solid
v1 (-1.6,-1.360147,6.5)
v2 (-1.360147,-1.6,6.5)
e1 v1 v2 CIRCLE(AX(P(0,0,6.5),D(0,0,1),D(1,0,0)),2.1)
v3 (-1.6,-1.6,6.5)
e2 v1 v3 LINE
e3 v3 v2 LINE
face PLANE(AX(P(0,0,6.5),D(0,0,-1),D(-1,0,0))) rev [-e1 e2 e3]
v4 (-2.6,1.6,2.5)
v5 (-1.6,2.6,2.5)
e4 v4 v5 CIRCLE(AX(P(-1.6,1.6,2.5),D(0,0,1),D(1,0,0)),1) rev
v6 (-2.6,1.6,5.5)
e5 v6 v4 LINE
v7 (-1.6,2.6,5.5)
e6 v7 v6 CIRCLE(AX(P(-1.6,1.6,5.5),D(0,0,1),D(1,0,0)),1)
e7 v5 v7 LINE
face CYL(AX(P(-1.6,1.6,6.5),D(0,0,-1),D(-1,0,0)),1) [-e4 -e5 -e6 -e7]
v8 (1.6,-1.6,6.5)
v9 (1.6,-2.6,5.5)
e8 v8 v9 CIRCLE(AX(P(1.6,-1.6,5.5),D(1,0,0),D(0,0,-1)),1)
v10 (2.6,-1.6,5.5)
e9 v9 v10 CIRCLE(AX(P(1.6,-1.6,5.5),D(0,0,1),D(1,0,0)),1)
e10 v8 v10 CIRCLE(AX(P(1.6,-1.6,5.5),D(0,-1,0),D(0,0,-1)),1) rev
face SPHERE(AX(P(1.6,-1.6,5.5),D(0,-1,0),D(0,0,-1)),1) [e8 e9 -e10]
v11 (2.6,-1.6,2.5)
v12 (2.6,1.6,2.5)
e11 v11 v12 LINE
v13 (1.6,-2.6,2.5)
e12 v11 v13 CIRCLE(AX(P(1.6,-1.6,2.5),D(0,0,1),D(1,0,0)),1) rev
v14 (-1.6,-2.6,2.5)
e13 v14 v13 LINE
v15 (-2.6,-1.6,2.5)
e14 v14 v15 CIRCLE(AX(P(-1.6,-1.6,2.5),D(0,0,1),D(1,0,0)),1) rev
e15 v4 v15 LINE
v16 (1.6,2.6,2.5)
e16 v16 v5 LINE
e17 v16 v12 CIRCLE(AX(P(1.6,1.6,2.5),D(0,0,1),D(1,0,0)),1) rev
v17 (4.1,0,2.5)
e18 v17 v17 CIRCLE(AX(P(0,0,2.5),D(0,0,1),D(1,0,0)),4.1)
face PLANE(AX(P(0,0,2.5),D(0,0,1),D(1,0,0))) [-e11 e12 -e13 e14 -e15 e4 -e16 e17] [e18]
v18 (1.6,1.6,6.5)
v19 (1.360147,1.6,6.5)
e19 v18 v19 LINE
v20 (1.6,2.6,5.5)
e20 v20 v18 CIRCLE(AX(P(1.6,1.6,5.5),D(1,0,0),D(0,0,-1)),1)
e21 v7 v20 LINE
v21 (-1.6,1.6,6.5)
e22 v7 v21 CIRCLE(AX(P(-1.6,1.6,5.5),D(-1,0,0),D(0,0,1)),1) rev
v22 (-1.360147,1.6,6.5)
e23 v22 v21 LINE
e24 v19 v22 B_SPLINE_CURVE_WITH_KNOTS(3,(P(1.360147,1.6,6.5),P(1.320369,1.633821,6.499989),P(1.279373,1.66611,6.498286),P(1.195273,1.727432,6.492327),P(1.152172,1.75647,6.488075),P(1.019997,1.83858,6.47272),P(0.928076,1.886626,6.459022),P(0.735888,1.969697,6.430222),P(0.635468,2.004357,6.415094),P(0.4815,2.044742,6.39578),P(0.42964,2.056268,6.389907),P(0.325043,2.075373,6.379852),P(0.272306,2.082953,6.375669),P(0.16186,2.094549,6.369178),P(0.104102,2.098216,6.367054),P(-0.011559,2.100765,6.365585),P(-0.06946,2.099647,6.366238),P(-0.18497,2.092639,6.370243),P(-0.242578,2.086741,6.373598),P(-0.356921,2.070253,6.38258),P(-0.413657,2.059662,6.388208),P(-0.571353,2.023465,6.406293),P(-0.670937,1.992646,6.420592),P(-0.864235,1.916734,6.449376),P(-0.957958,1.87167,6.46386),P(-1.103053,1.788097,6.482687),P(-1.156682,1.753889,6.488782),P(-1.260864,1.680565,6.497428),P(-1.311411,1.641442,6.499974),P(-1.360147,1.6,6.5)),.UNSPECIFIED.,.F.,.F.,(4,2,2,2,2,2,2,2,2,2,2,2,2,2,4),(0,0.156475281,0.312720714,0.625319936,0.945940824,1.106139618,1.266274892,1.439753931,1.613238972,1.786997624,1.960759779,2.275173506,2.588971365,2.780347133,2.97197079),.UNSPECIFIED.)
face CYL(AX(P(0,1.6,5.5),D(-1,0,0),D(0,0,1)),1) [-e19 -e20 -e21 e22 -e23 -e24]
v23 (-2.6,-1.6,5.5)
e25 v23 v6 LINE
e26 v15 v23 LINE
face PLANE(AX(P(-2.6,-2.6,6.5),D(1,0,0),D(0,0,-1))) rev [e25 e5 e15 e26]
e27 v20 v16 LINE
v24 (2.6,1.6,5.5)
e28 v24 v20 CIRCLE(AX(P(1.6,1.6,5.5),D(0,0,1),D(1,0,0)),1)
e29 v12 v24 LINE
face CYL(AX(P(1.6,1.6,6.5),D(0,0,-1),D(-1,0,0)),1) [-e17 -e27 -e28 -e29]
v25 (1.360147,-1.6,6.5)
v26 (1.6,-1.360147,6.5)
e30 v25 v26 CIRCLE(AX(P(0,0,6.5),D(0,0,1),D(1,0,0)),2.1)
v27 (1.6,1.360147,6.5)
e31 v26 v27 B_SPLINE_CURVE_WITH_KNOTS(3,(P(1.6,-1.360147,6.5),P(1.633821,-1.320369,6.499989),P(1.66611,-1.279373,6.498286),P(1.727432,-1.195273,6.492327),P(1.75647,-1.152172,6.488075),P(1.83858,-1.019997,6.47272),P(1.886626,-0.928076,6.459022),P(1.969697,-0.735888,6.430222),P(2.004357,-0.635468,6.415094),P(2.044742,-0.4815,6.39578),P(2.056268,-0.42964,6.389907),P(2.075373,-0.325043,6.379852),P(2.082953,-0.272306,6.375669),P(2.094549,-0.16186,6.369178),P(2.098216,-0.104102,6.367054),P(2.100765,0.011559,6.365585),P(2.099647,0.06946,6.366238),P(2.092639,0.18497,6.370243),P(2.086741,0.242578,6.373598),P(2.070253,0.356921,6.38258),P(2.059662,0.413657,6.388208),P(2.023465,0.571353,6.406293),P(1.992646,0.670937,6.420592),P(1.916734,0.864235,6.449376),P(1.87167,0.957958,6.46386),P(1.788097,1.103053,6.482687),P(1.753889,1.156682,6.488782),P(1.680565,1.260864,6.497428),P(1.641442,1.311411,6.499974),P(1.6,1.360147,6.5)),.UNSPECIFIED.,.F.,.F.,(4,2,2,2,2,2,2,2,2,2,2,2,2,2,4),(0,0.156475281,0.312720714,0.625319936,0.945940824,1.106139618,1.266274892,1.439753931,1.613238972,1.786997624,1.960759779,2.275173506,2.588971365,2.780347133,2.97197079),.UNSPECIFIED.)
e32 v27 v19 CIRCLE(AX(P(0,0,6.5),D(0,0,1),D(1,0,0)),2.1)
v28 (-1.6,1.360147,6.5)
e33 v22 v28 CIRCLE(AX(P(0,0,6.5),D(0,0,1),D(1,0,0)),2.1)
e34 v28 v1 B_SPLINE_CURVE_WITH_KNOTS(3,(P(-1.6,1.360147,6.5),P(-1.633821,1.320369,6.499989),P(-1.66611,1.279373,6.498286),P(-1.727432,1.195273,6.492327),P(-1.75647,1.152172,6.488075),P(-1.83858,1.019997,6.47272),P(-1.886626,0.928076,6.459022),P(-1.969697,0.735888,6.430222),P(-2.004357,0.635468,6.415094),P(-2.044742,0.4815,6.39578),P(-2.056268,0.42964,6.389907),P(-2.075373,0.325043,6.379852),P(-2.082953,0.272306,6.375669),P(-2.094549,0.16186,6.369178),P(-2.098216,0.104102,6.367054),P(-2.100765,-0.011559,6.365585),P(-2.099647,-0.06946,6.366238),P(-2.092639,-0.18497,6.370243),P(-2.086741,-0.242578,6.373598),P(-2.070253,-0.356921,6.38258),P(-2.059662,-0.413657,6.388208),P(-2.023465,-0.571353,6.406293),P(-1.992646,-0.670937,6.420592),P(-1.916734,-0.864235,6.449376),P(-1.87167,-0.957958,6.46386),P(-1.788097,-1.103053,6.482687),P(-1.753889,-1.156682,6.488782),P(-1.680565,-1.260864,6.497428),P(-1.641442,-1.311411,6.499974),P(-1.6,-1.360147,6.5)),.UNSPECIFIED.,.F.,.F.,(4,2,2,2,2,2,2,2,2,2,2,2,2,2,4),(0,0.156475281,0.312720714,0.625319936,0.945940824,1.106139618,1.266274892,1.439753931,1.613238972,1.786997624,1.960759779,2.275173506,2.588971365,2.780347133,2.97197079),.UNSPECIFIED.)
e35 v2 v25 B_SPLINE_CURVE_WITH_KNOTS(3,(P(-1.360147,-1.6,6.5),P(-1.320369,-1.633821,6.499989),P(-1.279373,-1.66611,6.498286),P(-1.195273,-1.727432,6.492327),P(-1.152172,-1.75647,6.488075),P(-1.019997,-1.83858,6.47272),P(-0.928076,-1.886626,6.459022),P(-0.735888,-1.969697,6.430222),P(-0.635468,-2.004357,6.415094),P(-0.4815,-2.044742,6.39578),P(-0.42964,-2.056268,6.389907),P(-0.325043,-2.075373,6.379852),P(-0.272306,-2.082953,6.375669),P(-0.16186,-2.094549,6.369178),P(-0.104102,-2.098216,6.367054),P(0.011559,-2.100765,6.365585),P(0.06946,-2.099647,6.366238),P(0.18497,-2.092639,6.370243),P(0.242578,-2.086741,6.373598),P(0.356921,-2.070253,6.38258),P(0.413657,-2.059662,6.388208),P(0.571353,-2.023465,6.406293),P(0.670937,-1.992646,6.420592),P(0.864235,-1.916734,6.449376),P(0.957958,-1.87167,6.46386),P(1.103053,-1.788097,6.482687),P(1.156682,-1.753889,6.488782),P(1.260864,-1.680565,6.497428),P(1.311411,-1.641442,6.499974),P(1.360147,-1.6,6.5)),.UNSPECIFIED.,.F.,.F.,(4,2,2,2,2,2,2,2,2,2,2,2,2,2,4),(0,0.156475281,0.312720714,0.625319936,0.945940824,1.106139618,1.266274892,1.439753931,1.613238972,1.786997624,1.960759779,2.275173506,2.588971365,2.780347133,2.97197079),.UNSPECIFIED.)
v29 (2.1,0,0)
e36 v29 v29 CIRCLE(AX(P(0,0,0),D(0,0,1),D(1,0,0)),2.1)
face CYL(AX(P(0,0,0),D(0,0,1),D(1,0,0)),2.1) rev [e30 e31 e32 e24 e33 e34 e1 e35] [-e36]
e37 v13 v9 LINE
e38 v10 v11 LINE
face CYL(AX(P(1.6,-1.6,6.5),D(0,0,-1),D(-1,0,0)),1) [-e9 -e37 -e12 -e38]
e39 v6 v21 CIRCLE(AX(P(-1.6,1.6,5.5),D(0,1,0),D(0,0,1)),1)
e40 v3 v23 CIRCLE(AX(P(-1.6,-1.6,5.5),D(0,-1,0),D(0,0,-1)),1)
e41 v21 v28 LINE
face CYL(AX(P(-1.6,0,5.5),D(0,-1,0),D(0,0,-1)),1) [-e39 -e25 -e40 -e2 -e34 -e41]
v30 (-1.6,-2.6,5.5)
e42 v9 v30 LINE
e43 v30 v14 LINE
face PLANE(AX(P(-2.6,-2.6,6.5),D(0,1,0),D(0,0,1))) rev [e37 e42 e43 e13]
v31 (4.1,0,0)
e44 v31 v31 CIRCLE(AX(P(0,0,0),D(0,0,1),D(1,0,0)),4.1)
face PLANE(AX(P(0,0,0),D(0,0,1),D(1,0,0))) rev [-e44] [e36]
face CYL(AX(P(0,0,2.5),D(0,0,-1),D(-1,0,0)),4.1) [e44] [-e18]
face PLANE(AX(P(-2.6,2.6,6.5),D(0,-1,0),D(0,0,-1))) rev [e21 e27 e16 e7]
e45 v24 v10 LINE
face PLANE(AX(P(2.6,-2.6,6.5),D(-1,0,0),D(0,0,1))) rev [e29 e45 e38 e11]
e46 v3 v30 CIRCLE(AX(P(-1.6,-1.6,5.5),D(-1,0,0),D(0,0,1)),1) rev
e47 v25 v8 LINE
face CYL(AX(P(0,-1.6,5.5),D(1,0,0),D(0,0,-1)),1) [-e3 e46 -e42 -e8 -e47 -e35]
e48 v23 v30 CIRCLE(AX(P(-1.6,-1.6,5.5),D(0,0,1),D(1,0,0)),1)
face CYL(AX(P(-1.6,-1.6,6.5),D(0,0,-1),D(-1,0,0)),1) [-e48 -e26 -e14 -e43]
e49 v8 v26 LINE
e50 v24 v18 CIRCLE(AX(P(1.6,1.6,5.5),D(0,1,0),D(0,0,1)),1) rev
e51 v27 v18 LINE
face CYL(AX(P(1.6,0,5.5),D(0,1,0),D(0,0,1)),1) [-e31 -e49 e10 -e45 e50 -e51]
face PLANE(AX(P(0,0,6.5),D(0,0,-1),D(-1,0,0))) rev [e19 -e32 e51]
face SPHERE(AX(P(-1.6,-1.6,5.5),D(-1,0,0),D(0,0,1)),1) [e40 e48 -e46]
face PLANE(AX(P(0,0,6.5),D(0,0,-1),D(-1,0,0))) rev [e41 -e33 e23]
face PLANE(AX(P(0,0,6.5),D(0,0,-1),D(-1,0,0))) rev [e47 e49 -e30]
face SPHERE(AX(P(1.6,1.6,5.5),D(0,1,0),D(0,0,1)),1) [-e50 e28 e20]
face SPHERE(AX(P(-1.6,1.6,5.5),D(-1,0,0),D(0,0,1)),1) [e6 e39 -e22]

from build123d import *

# Parameters (mm, degrees)
SKETCH1_R           = 4.1
BOSS_EXTRUDE1_DEPTH = 2.5
SKETCH2_W           = 5.2
SKETCH2_H           = 5.2
BOSS_EXTRUDE2_DEPTH = 4
SKETCH3_R           = 2.1
CUT_EXTRUDE1_DEPTH  = 9.710338685
FILLET1_R           = 1


with BuildPart() as part:
    # Sketch1 → Boss-Extrude1 (new body)
    with BuildSketch(Plane(origin=(0, 0, 0), x_dir=(0, 1, 0), z_dir=(0, 0, 1))):
        with Locations(Location((0, 0, 0), (0, 0, 270))):
            Circle(SKETCH1_R)
    extrude(amount=BOSS_EXTRUDE1_DEPTH)

    # Sketch2 → Boss-Extrude2 (add)
    with BuildSketch(Plane.XY.offset(2.5)):
        Rectangle(SKETCH2_W, SKETCH2_H)
    extrude(amount=BOSS_EXTRUDE2_DEPTH)

    # Sketch3 → Cut-Extrude1 (cut, through all)
    with BuildSketch(Plane.XY.offset(6.5)):
        Circle(SKETCH3_R)
    extrude(amount=-CUT_EXTRUDE1_DEPTH, mode=Mode.SUBTRACT)

    # Fillet1
    # the kernel refuses this fillet: 1 mm, written as the material it takes off along each edge
    with BuildSketch(Plane(origin=(-1.6, -1.6, 5.5), x_dir=(0, -1, 0), z_dir=(0, 0, 1))) as fillet1_piece_1_section:
        Polygon((0, 0), (FILLET1_R, 0), (FILLET1_R, -FILLET1_R), (0, -FILLET1_R), align=None)
    fillet1_piece_1 = extrude(amount=FILLET1_R, mode=Mode.PRIVATE)
    fillet1_piece_1 = fillet1_piece_1 - Plane(origin=(-1.6, -1.6, 5.5), x_dir=(0.7071067811865475, 0.7071067811865475, 0), z_dir=(0, 0, 1)) * Sphere(FILLET1_R, mode=Mode.PRIVATE)
    add(fillet1_piece_1, mode=Mode.SUBTRACT)
    with BuildSketch(Plane(origin=(1.6, -1.6, 5.5), x_dir=(0, -1, 0), z_dir=(0, 0, 1))) as fillet1_piece_2_section:
        Polygon((0, 0), (FILLET1_R, 0), (FILLET1_R, FILLET1_R), (0, FILLET1_R), align=None)
    fillet1_piece_2 = extrude(amount=FILLET1_R, mode=Mode.PRIVATE)
    fillet1_piece_2 = fillet1_piece_2 - Plane(origin=(1.6, -1.6, 5.5), x_dir=(-0.7071067811865475, 0.7071067811865475, 0), z_dir=(0, 0, 1)) * Sphere(FILLET1_R, mode=Mode.PRIVATE)
    add(fillet1_piece_2, mode=Mode.SUBTRACT)
    with BuildSketch(Plane(origin=(1.6, 1.6, 5.5), x_dir=(1, 0, 0), z_dir=(0, 0, 1))) as fillet1_piece_3_section:
        Polygon((0, 0), (FILLET1_R, 0), (FILLET1_R, FILLET1_R), (0, FILLET1_R), align=None)
    fillet1_piece_3 = extrude(amount=FILLET1_R, mode=Mode.PRIVATE)
    fillet1_piece_3 = fillet1_piece_3 - Plane(origin=(1.6, 1.6, 5.5), x_dir=(-0.7071067811865475, -0.7071067811865475, 0), z_dir=(0, 0, 1)) * Sphere(FILLET1_R, mode=Mode.PRIVATE)
    add(fillet1_piece_3, mode=Mode.SUBTRACT)
    with BuildSketch(Plane(origin=(-1.6, 1.6, 5.5), x_dir=(0, 1, 0), z_dir=(0, 0, 1))) as fillet1_piece_4_section:
        Polygon((0, 0), (FILLET1_R, 0), (FILLET1_R, FILLET1_R), (0, FILLET1_R), align=None)
    fillet1_piece_4 = extrude(amount=FILLET1_R, mode=Mode.PRIVATE)
    fillet1_piece_4 = fillet1_piece_4 - Plane(origin=(-1.6, 1.6, 5.5), x_dir=(0.7071067811865475, -0.7071067811865475, 0), z_dir=(0, 0, 1)) * Sphere(FILLET1_R, mode=Mode.PRIVATE)
    add(fillet1_piece_4, mode=Mode.SUBTRACT)
    with BuildSketch(Plane(origin=(-1.6, -2.6, 6.5), x_dir=(0, 0, -1), z_dir=(1, 0, 0)), Plane(origin=(2.6, -1.6, 6.5), x_dir=(0, 0, -1), z_dir=(0, 1, 0)), Plane(origin=(1.6, 2.6, 6.5), x_dir=(0, 0, -1), z_dir=(-1, 0, 0)), Plane(origin=(-2.6, 1.6, 6.5), x_dir=(0, 0, -1), z_dir=(0, -1, 0))) as fillet1_piece_5:
        with BuildLine():
            CenterArc((FILLET1_R, FILLET1_R), FILLET1_R, 180, 90)
            Line((0, FILLET1_R), (0, 0))
            Line((0, 0), (FILLET1_R, 0))
        make_face()
    extrude(amount=3.2, mode=Mode.SUBTRACT)
    with BuildSketch(Plane(origin=(2.6, -2.6, 2.5), x_dir=(-1, 0, 0), z_dir=(0, 0, 1)), Plane(origin=(2.6, 2.6, 2.5), x_dir=(0, -1, 0), z_dir=(0, 0, 1)), Plane(origin=(-2.6, 2.6, 2.5), x_dir=(1, 0, 0), z_dir=(0, 0, 1))) as fillet1_piece_6:
        with BuildLine():
            CenterArc((FILLET1_R, -FILLET1_R), FILLET1_R, 90, 90)
            Line((0, -FILLET1_R), (0, 0))
            Line((0, 0), (FILLET1_R, 0))
        make_face()
    extrude(amount=3, mode=Mode.SUBTRACT)
    with BuildSketch(Plane(origin=(-2.6, -2.6, 2.5), x_dir=(1, 0, 0), z_dir=(0, 0, 1))) as fillet1_piece_7:
        with BuildLine():
            CenterArc((FILLET1_R, FILLET1_R), FILLET1_R, 180, 90)
            Line((0, FILLET1_R), (0, 0))
            Line((0, 0), (FILLET1_R, 0))
        make_face()
    extrude(amount=3, mode=Mode.SUBTRACT)


solid = part.part
